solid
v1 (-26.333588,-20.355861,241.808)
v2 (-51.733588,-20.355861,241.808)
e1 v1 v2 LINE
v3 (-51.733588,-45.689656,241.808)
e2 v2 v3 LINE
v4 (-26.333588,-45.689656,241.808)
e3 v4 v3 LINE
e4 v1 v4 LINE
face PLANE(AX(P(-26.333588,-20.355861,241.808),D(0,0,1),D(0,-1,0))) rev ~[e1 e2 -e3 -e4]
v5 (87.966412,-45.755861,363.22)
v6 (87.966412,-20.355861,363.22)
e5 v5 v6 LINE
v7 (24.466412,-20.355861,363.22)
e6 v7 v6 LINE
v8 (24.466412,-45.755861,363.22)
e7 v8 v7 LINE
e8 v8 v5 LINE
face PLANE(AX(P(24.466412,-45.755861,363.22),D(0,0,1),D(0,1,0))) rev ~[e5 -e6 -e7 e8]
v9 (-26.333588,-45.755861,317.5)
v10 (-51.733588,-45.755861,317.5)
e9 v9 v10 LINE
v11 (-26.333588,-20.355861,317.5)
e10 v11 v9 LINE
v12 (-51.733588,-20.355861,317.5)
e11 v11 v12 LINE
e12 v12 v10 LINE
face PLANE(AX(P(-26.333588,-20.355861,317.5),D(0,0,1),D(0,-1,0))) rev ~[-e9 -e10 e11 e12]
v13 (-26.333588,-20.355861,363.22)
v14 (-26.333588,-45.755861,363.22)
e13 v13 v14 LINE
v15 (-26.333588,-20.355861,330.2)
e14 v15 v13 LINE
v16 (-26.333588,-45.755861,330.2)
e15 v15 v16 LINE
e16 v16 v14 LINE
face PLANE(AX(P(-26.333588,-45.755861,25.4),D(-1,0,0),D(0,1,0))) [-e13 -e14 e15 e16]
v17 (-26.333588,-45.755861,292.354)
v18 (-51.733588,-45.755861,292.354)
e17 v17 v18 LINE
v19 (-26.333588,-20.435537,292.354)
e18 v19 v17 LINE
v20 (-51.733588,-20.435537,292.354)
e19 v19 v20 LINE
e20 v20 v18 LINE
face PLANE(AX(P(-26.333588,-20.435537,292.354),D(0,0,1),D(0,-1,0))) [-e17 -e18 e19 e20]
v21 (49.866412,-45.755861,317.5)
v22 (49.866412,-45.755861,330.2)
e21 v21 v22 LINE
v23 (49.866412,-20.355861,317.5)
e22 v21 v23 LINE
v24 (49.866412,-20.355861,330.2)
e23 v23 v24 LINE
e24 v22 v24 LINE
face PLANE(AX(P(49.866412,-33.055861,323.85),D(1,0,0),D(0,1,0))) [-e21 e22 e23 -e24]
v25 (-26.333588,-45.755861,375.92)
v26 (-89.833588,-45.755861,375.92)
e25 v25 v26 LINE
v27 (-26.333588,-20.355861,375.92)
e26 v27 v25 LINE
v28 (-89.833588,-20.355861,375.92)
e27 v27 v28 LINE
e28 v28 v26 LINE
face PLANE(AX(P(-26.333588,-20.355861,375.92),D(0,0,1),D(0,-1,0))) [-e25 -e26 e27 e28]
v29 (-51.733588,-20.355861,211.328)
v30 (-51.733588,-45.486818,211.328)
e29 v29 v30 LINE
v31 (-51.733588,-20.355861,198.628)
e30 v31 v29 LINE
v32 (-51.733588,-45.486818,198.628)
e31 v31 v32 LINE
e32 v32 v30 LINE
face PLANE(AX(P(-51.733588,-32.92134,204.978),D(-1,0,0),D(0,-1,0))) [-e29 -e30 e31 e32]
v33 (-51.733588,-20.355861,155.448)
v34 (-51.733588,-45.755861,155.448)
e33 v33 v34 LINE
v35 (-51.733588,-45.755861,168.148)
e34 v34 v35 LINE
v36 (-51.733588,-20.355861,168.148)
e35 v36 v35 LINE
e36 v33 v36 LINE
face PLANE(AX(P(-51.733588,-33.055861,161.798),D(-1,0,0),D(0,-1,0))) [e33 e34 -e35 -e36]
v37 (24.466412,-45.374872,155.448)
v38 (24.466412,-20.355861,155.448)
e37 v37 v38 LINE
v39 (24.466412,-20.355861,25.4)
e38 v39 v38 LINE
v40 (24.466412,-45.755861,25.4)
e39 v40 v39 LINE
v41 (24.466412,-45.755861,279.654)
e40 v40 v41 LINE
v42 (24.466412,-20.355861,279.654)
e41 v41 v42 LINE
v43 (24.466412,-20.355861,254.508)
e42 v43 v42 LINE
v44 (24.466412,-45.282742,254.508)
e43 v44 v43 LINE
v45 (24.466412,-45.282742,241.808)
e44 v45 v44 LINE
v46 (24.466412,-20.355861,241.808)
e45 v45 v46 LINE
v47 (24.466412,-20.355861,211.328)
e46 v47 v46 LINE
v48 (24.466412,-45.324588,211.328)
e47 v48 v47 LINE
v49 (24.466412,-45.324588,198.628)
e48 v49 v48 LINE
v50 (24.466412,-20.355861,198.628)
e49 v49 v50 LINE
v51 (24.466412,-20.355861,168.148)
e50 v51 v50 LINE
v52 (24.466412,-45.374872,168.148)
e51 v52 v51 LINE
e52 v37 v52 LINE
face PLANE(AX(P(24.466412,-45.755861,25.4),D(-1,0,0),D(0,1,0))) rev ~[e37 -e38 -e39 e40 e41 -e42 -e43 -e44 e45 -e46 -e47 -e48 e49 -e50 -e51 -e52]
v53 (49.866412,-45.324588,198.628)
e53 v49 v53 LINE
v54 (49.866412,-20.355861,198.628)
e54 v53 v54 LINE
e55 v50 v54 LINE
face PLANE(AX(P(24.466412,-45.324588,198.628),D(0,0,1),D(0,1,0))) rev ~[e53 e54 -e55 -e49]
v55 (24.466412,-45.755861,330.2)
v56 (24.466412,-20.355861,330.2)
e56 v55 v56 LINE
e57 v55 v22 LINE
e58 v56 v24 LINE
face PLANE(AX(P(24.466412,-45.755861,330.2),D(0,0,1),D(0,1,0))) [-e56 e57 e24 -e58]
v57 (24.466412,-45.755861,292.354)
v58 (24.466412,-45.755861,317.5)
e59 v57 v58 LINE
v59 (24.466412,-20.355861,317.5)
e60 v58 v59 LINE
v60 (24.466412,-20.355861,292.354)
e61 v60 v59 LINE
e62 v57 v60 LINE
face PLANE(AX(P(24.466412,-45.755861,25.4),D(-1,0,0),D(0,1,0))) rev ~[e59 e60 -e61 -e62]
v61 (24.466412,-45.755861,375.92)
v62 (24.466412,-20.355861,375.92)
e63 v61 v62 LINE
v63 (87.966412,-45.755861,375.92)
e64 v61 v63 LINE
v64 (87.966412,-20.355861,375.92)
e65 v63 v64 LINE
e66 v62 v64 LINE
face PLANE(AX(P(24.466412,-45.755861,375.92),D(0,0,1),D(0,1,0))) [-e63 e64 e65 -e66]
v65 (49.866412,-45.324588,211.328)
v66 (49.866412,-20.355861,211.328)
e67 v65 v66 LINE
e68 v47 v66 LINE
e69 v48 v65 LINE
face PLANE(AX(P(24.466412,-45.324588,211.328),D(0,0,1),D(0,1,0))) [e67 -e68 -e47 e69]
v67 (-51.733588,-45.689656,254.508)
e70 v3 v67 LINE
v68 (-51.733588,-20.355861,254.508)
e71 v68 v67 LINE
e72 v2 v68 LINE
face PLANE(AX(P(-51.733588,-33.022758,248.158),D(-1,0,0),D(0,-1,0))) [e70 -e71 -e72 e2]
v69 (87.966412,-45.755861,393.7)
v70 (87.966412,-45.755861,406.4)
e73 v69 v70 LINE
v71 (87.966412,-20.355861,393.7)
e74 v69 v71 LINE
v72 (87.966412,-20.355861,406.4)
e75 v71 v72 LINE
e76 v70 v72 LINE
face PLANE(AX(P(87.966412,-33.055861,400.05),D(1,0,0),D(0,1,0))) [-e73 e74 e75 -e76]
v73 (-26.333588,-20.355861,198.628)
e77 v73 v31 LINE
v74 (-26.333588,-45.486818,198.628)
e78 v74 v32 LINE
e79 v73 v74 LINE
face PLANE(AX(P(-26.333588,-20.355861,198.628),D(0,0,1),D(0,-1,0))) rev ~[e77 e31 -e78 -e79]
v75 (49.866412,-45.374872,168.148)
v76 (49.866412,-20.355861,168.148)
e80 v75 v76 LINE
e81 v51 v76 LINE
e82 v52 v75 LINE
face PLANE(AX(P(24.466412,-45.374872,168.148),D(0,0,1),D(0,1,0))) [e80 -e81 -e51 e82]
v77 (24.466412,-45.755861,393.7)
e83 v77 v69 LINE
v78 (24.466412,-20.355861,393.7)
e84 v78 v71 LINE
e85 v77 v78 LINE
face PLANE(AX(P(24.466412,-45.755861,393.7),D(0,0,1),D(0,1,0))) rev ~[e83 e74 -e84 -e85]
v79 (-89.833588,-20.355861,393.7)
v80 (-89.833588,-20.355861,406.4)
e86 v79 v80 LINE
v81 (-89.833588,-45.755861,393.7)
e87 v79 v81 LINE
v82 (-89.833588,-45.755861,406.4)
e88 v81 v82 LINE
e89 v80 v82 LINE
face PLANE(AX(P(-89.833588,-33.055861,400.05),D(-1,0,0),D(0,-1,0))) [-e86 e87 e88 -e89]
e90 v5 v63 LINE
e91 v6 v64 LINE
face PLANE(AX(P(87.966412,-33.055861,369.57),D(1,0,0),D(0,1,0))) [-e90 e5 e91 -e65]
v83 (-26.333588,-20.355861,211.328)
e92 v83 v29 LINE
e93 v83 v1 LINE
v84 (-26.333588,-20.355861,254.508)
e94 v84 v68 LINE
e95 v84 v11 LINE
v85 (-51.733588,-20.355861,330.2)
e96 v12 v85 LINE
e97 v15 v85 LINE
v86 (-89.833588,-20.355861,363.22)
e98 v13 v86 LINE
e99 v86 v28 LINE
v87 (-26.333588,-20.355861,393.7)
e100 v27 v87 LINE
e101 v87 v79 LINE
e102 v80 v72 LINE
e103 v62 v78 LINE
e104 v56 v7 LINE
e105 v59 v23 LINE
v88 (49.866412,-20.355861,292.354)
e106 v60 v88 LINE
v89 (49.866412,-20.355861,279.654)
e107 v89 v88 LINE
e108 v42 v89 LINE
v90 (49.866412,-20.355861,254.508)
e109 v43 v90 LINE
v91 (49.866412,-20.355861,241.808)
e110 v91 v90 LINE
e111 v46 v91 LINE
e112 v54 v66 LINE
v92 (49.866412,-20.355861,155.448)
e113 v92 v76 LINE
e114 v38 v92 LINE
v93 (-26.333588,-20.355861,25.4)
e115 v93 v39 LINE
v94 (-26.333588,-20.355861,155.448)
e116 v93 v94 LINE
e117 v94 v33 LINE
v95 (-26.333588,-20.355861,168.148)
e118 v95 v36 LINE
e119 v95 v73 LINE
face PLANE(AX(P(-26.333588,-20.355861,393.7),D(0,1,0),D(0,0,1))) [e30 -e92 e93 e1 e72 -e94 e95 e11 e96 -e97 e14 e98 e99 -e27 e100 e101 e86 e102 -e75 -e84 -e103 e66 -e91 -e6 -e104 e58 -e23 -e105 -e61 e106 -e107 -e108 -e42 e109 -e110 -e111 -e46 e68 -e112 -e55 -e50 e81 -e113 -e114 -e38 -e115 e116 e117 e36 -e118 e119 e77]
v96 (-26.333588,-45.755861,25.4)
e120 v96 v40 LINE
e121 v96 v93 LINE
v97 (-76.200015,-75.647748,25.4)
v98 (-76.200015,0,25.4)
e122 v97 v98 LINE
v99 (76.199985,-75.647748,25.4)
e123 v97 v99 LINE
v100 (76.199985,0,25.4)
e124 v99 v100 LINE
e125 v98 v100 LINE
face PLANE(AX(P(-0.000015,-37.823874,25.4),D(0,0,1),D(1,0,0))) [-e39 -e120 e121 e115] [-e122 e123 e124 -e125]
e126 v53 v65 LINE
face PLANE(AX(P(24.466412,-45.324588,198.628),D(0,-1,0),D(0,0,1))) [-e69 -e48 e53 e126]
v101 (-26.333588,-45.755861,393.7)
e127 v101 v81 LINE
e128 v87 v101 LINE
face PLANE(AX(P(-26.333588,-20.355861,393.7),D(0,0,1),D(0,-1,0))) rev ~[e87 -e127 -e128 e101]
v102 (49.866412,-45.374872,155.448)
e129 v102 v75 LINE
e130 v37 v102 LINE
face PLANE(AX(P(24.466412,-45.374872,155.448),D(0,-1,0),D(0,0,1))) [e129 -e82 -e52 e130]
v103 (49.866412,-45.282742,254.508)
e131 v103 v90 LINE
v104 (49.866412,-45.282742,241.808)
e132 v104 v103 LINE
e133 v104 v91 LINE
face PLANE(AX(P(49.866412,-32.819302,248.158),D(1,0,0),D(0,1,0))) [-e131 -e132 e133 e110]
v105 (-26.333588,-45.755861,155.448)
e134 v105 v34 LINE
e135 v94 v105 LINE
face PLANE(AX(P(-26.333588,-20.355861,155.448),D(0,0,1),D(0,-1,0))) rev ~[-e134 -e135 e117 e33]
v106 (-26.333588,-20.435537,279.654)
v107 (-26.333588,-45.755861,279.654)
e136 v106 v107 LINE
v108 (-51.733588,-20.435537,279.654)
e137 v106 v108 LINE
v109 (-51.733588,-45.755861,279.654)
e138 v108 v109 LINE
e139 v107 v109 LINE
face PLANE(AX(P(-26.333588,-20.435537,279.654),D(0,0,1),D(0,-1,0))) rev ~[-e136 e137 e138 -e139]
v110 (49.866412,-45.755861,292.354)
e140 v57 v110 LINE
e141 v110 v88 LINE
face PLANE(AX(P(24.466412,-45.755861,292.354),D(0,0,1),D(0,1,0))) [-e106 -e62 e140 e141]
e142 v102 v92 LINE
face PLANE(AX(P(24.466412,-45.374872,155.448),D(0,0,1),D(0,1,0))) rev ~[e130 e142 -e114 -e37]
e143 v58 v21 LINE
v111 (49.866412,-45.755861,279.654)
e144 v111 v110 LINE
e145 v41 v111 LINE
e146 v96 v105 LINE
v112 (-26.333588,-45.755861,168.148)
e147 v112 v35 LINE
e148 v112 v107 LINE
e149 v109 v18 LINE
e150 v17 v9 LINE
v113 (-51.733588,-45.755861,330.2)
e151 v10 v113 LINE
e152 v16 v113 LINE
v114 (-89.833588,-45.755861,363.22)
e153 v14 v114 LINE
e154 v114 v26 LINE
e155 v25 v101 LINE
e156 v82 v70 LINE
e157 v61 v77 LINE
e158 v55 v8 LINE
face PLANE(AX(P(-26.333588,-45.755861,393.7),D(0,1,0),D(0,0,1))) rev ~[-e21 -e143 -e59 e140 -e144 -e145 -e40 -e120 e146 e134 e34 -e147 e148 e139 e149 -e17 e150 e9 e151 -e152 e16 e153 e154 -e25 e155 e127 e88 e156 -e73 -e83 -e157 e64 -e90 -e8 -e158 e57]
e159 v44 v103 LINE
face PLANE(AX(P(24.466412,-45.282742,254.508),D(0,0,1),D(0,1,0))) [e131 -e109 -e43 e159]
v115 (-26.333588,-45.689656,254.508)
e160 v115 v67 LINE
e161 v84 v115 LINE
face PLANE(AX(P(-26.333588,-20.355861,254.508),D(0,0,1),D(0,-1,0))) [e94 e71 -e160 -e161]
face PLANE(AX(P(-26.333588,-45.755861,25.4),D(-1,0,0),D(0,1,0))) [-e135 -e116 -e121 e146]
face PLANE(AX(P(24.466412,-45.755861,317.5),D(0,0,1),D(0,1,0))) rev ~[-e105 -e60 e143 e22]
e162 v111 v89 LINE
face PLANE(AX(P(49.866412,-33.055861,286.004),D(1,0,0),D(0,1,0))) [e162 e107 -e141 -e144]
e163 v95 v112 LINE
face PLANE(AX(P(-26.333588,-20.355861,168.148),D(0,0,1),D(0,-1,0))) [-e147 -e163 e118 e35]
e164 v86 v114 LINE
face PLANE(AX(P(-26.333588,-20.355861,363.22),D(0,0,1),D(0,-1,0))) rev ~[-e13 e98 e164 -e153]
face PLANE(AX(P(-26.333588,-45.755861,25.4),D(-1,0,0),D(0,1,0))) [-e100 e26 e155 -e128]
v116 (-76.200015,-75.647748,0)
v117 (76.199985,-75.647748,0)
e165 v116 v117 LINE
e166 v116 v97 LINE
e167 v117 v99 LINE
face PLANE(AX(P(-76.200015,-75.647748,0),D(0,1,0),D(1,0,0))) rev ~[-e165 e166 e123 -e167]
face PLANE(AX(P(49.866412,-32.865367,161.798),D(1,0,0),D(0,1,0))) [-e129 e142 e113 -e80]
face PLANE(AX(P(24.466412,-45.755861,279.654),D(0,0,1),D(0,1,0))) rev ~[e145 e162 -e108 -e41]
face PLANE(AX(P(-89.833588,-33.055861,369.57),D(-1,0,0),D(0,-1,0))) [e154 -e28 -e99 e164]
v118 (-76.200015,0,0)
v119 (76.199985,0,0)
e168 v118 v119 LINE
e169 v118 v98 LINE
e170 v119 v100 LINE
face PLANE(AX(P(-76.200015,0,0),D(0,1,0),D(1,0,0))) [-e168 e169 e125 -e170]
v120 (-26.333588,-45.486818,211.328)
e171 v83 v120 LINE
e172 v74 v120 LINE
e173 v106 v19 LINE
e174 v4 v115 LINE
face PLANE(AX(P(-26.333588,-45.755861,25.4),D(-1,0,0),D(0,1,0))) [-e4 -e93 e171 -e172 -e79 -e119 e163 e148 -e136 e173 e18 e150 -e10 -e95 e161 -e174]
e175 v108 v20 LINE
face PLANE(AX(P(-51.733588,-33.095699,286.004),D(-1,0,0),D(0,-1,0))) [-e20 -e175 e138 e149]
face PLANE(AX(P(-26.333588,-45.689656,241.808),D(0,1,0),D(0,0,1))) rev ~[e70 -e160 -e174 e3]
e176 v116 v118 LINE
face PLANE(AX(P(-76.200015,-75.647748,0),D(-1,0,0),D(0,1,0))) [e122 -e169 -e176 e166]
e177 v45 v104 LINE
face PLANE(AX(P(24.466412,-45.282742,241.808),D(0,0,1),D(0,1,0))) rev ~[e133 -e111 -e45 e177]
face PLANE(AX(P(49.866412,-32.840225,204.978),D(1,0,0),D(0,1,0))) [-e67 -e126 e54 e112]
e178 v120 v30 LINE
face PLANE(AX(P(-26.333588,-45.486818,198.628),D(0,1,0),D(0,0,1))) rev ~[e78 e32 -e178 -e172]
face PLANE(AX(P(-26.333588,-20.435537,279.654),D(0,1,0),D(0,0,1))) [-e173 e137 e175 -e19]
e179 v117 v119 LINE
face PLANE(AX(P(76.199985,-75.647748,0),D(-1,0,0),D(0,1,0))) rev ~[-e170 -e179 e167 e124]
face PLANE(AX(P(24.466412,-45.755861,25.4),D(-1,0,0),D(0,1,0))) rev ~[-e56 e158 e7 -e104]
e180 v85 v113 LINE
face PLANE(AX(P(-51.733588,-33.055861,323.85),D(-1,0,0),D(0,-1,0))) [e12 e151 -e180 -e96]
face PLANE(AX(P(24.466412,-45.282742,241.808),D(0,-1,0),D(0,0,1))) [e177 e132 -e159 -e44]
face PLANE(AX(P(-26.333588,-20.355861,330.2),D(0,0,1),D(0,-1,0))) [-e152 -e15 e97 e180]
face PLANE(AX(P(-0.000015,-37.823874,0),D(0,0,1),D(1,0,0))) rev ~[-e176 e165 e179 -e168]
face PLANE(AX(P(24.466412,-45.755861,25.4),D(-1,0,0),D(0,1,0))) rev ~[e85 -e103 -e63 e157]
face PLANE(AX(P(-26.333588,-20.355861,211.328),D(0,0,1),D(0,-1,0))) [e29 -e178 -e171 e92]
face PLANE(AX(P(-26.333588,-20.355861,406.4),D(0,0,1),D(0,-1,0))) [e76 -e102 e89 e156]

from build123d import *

# Parameters (mm, degrees)
F0_W      = 152.4
F0_H      = 75.6477481976
F1_DEPTH  = 25.4
F2_W      = 50.8
F2_H      = 25.4
F3_DEPTH  = 381
F4_W      = 25.4
F4_H      = 12.7
F5_DEPTH  = 63.5
F6_W      = 25.4
F6_H      = 12.7
F7_DEPTH  = 63.5
F8_W      = 25.4
F8_H      = 12.7
F9_DEPTH  = 63.5
F10_W     = 25.4
F10_H     = 12.7
F11_DEPTH = 63.5
F12_W     = 25.4
F12_H     = 12.7
F13_DEPTH = 25.4
F14_W     = 25.4
F14_H     = 12.7
F18_DEPTH = 25.4
F15_W     = 24.92688122
F15_H     = 12.7
F19_DEPTH = 25.4
F16_W     = 24.9687274059
F16_H     = 12.7
F20_DEPTH = 25.4
F17_W     = 25.0190113743
F17_H     = 12.7
F21_DEPTH = 25.4
F22_W     = 25.4
F22_H     = 12.7
F27_DEPTH = 25.4
F23_W     = 25.320323884
F23_H     = 12.7
F28_DEPTH = 25.4
F24_W     = 25.3337946793
F24_H     = 12.7
F29_DEPTH = 25.4
F25_W     = 25.1309572571
F25_H     = 12.7
F30_DEPTH = 25.4
F26_W     = 25.4
F26_H     = 12.7
F31_DEPTH = 25.4


with BuildPart() as f1:
    # F0 (on Top) → F1 (new body)
    with BuildSketch(Plane.XY):
        with Locations((-1.49496e-05, -37.8238740988)):
            Rectangle(F0_W, F0_H)
    extrude(amount=F1_DEPTH)

    # F2 (on face) → F3 (join)
    with BuildSketch(Plane.XY.offset(25.4)):
        with Locations((-0.9335875511, -33.0558609421)):
            Rectangle(F2_W, F2_H)
    extrude(amount=F3_DEPTH)

    # F4 (on face) → F5 (join)
    with BuildSketch(Plane.YZ.offset(24.4664124489)):
        with Locations((-33.0558609421, 400.05)):
            Rectangle(F4_W, F4_H)
    extrude(amount=F5_DEPTH)

    # F6 (on face) → F7 (join)
    with BuildSketch(Plane.YZ.offset(24.4664124489)):
        with Locations((-33.0558609421, 369.57)):
            Rectangle(F6_W, F6_H)
    extrude(amount=F7_DEPTH)

    # F8 (on face) → F9 (join)
    with BuildSketch(Plane(origin=(-26.3335875511, 0, 0), x_dir=(0, -1, 0), z_dir=(-1, 0, 0))):
        with Locations((33.0558609421, 400.05)):
            Rectangle(F8_W, F8_H)
    extrude(amount=F9_DEPTH)

    # F10 (on face) → F11 (join)
    with BuildSketch(Plane(origin=(-26.3335875511, 0, 0), x_dir=(0, -1, 0), z_dir=(-1, 0, 0))):
        with Locations((33.0558609421, 369.57)):
            Rectangle(F10_W, F10_H)
    extrude(amount=F11_DEPTH)

    # F12 (on face) → F13 (join)
    with BuildSketch(Plane.YZ.offset(24.4664124489)):
        with Locations((-33.0558609421, 323.85)):
            Rectangle(F12_W, F12_H)
    extrude(amount=F13_DEPTH)

    # F14 (on face) → F18 (join)
    with BuildSketch(Plane.YZ.offset(24.4664124489)):
        with Locations((-33.0558609421, 286.004)):
            Rectangle(F14_W, F14_H)
    extrude(amount=F18_DEPTH)

    # F15 (on face) → F19 (join)
    with BuildSketch(Plane.YZ.offset(24.4664124489)):
        with Locations((-32.8193015521, 248.158)):
            Rectangle(F15_W, F15_H)
    extrude(amount=F19_DEPTH)

    # F16 (on face) → F20 (join)
    with BuildSketch(Plane.YZ.offset(24.4664124489)):
        with Locations((-32.840224645, 204.978)):
            Rectangle(F16_W, F16_H)
    extrude(amount=F20_DEPTH)

    # F17 (on face) → F21 (join)
    with BuildSketch(Plane.YZ.offset(24.4664124489)):
        with Locations((-32.8653666293, 161.798)):
            Rectangle(F17_W, F17_H)
    extrude(amount=F21_DEPTH)

    # F22 (on face) → F27 (join)
    with BuildSketch(Plane(origin=(-26.3335875511, 0, 0), x_dir=(0, -1, 0), z_dir=(-1, 0, 0))):
        with Locations((33.0558609421, 323.85)):
            Rectangle(F22_W, F22_H)
    extrude(amount=F27_DEPTH)

    # F23 (on face) → F28 (join)
    with BuildSketch(Plane(origin=(-26.3335875511, 0, 0), x_dir=(0, -1, 0), z_dir=(-1, 0, 0))):
        with Locations((33.0956990001, 286.004)):
            Rectangle(F23_W, F23_H)
    extrude(amount=F28_DEPTH)

    # F24 (on face) → F29 (join)
    with BuildSketch(Plane(origin=(-26.3335875511, 0, 0), x_dir=(0, -1, 0), z_dir=(-1, 0, 0))):
        with Locations((33.0227582817, 248.158)):
            Rectangle(F24_W, F24_H)
    extrude(amount=F29_DEPTH)

    # F25 (on face) → F30 (join)
    with BuildSketch(Plane(origin=(-26.3335875511, 0, 0), x_dir=(0, -1, 0), z_dir=(-1, 0, 0))):
        with Locations((32.9213395706, 204.978)):
            Rectangle(F25_W, F25_H)
    extrude(amount=F30_DEPTH)

    # F26 (on face) → F31 (join)
    with BuildSketch(Plane(origin=(-26.3335875511, 0, 0), x_dir=(0, -1, 0), z_dir=(-1, 0, 0))):
        with Locations((33.0558609421, 161.798)):
            Rectangle(F26_W, F26_H)
    extrude(amount=F31_DEPTH)


solid = f1.part
